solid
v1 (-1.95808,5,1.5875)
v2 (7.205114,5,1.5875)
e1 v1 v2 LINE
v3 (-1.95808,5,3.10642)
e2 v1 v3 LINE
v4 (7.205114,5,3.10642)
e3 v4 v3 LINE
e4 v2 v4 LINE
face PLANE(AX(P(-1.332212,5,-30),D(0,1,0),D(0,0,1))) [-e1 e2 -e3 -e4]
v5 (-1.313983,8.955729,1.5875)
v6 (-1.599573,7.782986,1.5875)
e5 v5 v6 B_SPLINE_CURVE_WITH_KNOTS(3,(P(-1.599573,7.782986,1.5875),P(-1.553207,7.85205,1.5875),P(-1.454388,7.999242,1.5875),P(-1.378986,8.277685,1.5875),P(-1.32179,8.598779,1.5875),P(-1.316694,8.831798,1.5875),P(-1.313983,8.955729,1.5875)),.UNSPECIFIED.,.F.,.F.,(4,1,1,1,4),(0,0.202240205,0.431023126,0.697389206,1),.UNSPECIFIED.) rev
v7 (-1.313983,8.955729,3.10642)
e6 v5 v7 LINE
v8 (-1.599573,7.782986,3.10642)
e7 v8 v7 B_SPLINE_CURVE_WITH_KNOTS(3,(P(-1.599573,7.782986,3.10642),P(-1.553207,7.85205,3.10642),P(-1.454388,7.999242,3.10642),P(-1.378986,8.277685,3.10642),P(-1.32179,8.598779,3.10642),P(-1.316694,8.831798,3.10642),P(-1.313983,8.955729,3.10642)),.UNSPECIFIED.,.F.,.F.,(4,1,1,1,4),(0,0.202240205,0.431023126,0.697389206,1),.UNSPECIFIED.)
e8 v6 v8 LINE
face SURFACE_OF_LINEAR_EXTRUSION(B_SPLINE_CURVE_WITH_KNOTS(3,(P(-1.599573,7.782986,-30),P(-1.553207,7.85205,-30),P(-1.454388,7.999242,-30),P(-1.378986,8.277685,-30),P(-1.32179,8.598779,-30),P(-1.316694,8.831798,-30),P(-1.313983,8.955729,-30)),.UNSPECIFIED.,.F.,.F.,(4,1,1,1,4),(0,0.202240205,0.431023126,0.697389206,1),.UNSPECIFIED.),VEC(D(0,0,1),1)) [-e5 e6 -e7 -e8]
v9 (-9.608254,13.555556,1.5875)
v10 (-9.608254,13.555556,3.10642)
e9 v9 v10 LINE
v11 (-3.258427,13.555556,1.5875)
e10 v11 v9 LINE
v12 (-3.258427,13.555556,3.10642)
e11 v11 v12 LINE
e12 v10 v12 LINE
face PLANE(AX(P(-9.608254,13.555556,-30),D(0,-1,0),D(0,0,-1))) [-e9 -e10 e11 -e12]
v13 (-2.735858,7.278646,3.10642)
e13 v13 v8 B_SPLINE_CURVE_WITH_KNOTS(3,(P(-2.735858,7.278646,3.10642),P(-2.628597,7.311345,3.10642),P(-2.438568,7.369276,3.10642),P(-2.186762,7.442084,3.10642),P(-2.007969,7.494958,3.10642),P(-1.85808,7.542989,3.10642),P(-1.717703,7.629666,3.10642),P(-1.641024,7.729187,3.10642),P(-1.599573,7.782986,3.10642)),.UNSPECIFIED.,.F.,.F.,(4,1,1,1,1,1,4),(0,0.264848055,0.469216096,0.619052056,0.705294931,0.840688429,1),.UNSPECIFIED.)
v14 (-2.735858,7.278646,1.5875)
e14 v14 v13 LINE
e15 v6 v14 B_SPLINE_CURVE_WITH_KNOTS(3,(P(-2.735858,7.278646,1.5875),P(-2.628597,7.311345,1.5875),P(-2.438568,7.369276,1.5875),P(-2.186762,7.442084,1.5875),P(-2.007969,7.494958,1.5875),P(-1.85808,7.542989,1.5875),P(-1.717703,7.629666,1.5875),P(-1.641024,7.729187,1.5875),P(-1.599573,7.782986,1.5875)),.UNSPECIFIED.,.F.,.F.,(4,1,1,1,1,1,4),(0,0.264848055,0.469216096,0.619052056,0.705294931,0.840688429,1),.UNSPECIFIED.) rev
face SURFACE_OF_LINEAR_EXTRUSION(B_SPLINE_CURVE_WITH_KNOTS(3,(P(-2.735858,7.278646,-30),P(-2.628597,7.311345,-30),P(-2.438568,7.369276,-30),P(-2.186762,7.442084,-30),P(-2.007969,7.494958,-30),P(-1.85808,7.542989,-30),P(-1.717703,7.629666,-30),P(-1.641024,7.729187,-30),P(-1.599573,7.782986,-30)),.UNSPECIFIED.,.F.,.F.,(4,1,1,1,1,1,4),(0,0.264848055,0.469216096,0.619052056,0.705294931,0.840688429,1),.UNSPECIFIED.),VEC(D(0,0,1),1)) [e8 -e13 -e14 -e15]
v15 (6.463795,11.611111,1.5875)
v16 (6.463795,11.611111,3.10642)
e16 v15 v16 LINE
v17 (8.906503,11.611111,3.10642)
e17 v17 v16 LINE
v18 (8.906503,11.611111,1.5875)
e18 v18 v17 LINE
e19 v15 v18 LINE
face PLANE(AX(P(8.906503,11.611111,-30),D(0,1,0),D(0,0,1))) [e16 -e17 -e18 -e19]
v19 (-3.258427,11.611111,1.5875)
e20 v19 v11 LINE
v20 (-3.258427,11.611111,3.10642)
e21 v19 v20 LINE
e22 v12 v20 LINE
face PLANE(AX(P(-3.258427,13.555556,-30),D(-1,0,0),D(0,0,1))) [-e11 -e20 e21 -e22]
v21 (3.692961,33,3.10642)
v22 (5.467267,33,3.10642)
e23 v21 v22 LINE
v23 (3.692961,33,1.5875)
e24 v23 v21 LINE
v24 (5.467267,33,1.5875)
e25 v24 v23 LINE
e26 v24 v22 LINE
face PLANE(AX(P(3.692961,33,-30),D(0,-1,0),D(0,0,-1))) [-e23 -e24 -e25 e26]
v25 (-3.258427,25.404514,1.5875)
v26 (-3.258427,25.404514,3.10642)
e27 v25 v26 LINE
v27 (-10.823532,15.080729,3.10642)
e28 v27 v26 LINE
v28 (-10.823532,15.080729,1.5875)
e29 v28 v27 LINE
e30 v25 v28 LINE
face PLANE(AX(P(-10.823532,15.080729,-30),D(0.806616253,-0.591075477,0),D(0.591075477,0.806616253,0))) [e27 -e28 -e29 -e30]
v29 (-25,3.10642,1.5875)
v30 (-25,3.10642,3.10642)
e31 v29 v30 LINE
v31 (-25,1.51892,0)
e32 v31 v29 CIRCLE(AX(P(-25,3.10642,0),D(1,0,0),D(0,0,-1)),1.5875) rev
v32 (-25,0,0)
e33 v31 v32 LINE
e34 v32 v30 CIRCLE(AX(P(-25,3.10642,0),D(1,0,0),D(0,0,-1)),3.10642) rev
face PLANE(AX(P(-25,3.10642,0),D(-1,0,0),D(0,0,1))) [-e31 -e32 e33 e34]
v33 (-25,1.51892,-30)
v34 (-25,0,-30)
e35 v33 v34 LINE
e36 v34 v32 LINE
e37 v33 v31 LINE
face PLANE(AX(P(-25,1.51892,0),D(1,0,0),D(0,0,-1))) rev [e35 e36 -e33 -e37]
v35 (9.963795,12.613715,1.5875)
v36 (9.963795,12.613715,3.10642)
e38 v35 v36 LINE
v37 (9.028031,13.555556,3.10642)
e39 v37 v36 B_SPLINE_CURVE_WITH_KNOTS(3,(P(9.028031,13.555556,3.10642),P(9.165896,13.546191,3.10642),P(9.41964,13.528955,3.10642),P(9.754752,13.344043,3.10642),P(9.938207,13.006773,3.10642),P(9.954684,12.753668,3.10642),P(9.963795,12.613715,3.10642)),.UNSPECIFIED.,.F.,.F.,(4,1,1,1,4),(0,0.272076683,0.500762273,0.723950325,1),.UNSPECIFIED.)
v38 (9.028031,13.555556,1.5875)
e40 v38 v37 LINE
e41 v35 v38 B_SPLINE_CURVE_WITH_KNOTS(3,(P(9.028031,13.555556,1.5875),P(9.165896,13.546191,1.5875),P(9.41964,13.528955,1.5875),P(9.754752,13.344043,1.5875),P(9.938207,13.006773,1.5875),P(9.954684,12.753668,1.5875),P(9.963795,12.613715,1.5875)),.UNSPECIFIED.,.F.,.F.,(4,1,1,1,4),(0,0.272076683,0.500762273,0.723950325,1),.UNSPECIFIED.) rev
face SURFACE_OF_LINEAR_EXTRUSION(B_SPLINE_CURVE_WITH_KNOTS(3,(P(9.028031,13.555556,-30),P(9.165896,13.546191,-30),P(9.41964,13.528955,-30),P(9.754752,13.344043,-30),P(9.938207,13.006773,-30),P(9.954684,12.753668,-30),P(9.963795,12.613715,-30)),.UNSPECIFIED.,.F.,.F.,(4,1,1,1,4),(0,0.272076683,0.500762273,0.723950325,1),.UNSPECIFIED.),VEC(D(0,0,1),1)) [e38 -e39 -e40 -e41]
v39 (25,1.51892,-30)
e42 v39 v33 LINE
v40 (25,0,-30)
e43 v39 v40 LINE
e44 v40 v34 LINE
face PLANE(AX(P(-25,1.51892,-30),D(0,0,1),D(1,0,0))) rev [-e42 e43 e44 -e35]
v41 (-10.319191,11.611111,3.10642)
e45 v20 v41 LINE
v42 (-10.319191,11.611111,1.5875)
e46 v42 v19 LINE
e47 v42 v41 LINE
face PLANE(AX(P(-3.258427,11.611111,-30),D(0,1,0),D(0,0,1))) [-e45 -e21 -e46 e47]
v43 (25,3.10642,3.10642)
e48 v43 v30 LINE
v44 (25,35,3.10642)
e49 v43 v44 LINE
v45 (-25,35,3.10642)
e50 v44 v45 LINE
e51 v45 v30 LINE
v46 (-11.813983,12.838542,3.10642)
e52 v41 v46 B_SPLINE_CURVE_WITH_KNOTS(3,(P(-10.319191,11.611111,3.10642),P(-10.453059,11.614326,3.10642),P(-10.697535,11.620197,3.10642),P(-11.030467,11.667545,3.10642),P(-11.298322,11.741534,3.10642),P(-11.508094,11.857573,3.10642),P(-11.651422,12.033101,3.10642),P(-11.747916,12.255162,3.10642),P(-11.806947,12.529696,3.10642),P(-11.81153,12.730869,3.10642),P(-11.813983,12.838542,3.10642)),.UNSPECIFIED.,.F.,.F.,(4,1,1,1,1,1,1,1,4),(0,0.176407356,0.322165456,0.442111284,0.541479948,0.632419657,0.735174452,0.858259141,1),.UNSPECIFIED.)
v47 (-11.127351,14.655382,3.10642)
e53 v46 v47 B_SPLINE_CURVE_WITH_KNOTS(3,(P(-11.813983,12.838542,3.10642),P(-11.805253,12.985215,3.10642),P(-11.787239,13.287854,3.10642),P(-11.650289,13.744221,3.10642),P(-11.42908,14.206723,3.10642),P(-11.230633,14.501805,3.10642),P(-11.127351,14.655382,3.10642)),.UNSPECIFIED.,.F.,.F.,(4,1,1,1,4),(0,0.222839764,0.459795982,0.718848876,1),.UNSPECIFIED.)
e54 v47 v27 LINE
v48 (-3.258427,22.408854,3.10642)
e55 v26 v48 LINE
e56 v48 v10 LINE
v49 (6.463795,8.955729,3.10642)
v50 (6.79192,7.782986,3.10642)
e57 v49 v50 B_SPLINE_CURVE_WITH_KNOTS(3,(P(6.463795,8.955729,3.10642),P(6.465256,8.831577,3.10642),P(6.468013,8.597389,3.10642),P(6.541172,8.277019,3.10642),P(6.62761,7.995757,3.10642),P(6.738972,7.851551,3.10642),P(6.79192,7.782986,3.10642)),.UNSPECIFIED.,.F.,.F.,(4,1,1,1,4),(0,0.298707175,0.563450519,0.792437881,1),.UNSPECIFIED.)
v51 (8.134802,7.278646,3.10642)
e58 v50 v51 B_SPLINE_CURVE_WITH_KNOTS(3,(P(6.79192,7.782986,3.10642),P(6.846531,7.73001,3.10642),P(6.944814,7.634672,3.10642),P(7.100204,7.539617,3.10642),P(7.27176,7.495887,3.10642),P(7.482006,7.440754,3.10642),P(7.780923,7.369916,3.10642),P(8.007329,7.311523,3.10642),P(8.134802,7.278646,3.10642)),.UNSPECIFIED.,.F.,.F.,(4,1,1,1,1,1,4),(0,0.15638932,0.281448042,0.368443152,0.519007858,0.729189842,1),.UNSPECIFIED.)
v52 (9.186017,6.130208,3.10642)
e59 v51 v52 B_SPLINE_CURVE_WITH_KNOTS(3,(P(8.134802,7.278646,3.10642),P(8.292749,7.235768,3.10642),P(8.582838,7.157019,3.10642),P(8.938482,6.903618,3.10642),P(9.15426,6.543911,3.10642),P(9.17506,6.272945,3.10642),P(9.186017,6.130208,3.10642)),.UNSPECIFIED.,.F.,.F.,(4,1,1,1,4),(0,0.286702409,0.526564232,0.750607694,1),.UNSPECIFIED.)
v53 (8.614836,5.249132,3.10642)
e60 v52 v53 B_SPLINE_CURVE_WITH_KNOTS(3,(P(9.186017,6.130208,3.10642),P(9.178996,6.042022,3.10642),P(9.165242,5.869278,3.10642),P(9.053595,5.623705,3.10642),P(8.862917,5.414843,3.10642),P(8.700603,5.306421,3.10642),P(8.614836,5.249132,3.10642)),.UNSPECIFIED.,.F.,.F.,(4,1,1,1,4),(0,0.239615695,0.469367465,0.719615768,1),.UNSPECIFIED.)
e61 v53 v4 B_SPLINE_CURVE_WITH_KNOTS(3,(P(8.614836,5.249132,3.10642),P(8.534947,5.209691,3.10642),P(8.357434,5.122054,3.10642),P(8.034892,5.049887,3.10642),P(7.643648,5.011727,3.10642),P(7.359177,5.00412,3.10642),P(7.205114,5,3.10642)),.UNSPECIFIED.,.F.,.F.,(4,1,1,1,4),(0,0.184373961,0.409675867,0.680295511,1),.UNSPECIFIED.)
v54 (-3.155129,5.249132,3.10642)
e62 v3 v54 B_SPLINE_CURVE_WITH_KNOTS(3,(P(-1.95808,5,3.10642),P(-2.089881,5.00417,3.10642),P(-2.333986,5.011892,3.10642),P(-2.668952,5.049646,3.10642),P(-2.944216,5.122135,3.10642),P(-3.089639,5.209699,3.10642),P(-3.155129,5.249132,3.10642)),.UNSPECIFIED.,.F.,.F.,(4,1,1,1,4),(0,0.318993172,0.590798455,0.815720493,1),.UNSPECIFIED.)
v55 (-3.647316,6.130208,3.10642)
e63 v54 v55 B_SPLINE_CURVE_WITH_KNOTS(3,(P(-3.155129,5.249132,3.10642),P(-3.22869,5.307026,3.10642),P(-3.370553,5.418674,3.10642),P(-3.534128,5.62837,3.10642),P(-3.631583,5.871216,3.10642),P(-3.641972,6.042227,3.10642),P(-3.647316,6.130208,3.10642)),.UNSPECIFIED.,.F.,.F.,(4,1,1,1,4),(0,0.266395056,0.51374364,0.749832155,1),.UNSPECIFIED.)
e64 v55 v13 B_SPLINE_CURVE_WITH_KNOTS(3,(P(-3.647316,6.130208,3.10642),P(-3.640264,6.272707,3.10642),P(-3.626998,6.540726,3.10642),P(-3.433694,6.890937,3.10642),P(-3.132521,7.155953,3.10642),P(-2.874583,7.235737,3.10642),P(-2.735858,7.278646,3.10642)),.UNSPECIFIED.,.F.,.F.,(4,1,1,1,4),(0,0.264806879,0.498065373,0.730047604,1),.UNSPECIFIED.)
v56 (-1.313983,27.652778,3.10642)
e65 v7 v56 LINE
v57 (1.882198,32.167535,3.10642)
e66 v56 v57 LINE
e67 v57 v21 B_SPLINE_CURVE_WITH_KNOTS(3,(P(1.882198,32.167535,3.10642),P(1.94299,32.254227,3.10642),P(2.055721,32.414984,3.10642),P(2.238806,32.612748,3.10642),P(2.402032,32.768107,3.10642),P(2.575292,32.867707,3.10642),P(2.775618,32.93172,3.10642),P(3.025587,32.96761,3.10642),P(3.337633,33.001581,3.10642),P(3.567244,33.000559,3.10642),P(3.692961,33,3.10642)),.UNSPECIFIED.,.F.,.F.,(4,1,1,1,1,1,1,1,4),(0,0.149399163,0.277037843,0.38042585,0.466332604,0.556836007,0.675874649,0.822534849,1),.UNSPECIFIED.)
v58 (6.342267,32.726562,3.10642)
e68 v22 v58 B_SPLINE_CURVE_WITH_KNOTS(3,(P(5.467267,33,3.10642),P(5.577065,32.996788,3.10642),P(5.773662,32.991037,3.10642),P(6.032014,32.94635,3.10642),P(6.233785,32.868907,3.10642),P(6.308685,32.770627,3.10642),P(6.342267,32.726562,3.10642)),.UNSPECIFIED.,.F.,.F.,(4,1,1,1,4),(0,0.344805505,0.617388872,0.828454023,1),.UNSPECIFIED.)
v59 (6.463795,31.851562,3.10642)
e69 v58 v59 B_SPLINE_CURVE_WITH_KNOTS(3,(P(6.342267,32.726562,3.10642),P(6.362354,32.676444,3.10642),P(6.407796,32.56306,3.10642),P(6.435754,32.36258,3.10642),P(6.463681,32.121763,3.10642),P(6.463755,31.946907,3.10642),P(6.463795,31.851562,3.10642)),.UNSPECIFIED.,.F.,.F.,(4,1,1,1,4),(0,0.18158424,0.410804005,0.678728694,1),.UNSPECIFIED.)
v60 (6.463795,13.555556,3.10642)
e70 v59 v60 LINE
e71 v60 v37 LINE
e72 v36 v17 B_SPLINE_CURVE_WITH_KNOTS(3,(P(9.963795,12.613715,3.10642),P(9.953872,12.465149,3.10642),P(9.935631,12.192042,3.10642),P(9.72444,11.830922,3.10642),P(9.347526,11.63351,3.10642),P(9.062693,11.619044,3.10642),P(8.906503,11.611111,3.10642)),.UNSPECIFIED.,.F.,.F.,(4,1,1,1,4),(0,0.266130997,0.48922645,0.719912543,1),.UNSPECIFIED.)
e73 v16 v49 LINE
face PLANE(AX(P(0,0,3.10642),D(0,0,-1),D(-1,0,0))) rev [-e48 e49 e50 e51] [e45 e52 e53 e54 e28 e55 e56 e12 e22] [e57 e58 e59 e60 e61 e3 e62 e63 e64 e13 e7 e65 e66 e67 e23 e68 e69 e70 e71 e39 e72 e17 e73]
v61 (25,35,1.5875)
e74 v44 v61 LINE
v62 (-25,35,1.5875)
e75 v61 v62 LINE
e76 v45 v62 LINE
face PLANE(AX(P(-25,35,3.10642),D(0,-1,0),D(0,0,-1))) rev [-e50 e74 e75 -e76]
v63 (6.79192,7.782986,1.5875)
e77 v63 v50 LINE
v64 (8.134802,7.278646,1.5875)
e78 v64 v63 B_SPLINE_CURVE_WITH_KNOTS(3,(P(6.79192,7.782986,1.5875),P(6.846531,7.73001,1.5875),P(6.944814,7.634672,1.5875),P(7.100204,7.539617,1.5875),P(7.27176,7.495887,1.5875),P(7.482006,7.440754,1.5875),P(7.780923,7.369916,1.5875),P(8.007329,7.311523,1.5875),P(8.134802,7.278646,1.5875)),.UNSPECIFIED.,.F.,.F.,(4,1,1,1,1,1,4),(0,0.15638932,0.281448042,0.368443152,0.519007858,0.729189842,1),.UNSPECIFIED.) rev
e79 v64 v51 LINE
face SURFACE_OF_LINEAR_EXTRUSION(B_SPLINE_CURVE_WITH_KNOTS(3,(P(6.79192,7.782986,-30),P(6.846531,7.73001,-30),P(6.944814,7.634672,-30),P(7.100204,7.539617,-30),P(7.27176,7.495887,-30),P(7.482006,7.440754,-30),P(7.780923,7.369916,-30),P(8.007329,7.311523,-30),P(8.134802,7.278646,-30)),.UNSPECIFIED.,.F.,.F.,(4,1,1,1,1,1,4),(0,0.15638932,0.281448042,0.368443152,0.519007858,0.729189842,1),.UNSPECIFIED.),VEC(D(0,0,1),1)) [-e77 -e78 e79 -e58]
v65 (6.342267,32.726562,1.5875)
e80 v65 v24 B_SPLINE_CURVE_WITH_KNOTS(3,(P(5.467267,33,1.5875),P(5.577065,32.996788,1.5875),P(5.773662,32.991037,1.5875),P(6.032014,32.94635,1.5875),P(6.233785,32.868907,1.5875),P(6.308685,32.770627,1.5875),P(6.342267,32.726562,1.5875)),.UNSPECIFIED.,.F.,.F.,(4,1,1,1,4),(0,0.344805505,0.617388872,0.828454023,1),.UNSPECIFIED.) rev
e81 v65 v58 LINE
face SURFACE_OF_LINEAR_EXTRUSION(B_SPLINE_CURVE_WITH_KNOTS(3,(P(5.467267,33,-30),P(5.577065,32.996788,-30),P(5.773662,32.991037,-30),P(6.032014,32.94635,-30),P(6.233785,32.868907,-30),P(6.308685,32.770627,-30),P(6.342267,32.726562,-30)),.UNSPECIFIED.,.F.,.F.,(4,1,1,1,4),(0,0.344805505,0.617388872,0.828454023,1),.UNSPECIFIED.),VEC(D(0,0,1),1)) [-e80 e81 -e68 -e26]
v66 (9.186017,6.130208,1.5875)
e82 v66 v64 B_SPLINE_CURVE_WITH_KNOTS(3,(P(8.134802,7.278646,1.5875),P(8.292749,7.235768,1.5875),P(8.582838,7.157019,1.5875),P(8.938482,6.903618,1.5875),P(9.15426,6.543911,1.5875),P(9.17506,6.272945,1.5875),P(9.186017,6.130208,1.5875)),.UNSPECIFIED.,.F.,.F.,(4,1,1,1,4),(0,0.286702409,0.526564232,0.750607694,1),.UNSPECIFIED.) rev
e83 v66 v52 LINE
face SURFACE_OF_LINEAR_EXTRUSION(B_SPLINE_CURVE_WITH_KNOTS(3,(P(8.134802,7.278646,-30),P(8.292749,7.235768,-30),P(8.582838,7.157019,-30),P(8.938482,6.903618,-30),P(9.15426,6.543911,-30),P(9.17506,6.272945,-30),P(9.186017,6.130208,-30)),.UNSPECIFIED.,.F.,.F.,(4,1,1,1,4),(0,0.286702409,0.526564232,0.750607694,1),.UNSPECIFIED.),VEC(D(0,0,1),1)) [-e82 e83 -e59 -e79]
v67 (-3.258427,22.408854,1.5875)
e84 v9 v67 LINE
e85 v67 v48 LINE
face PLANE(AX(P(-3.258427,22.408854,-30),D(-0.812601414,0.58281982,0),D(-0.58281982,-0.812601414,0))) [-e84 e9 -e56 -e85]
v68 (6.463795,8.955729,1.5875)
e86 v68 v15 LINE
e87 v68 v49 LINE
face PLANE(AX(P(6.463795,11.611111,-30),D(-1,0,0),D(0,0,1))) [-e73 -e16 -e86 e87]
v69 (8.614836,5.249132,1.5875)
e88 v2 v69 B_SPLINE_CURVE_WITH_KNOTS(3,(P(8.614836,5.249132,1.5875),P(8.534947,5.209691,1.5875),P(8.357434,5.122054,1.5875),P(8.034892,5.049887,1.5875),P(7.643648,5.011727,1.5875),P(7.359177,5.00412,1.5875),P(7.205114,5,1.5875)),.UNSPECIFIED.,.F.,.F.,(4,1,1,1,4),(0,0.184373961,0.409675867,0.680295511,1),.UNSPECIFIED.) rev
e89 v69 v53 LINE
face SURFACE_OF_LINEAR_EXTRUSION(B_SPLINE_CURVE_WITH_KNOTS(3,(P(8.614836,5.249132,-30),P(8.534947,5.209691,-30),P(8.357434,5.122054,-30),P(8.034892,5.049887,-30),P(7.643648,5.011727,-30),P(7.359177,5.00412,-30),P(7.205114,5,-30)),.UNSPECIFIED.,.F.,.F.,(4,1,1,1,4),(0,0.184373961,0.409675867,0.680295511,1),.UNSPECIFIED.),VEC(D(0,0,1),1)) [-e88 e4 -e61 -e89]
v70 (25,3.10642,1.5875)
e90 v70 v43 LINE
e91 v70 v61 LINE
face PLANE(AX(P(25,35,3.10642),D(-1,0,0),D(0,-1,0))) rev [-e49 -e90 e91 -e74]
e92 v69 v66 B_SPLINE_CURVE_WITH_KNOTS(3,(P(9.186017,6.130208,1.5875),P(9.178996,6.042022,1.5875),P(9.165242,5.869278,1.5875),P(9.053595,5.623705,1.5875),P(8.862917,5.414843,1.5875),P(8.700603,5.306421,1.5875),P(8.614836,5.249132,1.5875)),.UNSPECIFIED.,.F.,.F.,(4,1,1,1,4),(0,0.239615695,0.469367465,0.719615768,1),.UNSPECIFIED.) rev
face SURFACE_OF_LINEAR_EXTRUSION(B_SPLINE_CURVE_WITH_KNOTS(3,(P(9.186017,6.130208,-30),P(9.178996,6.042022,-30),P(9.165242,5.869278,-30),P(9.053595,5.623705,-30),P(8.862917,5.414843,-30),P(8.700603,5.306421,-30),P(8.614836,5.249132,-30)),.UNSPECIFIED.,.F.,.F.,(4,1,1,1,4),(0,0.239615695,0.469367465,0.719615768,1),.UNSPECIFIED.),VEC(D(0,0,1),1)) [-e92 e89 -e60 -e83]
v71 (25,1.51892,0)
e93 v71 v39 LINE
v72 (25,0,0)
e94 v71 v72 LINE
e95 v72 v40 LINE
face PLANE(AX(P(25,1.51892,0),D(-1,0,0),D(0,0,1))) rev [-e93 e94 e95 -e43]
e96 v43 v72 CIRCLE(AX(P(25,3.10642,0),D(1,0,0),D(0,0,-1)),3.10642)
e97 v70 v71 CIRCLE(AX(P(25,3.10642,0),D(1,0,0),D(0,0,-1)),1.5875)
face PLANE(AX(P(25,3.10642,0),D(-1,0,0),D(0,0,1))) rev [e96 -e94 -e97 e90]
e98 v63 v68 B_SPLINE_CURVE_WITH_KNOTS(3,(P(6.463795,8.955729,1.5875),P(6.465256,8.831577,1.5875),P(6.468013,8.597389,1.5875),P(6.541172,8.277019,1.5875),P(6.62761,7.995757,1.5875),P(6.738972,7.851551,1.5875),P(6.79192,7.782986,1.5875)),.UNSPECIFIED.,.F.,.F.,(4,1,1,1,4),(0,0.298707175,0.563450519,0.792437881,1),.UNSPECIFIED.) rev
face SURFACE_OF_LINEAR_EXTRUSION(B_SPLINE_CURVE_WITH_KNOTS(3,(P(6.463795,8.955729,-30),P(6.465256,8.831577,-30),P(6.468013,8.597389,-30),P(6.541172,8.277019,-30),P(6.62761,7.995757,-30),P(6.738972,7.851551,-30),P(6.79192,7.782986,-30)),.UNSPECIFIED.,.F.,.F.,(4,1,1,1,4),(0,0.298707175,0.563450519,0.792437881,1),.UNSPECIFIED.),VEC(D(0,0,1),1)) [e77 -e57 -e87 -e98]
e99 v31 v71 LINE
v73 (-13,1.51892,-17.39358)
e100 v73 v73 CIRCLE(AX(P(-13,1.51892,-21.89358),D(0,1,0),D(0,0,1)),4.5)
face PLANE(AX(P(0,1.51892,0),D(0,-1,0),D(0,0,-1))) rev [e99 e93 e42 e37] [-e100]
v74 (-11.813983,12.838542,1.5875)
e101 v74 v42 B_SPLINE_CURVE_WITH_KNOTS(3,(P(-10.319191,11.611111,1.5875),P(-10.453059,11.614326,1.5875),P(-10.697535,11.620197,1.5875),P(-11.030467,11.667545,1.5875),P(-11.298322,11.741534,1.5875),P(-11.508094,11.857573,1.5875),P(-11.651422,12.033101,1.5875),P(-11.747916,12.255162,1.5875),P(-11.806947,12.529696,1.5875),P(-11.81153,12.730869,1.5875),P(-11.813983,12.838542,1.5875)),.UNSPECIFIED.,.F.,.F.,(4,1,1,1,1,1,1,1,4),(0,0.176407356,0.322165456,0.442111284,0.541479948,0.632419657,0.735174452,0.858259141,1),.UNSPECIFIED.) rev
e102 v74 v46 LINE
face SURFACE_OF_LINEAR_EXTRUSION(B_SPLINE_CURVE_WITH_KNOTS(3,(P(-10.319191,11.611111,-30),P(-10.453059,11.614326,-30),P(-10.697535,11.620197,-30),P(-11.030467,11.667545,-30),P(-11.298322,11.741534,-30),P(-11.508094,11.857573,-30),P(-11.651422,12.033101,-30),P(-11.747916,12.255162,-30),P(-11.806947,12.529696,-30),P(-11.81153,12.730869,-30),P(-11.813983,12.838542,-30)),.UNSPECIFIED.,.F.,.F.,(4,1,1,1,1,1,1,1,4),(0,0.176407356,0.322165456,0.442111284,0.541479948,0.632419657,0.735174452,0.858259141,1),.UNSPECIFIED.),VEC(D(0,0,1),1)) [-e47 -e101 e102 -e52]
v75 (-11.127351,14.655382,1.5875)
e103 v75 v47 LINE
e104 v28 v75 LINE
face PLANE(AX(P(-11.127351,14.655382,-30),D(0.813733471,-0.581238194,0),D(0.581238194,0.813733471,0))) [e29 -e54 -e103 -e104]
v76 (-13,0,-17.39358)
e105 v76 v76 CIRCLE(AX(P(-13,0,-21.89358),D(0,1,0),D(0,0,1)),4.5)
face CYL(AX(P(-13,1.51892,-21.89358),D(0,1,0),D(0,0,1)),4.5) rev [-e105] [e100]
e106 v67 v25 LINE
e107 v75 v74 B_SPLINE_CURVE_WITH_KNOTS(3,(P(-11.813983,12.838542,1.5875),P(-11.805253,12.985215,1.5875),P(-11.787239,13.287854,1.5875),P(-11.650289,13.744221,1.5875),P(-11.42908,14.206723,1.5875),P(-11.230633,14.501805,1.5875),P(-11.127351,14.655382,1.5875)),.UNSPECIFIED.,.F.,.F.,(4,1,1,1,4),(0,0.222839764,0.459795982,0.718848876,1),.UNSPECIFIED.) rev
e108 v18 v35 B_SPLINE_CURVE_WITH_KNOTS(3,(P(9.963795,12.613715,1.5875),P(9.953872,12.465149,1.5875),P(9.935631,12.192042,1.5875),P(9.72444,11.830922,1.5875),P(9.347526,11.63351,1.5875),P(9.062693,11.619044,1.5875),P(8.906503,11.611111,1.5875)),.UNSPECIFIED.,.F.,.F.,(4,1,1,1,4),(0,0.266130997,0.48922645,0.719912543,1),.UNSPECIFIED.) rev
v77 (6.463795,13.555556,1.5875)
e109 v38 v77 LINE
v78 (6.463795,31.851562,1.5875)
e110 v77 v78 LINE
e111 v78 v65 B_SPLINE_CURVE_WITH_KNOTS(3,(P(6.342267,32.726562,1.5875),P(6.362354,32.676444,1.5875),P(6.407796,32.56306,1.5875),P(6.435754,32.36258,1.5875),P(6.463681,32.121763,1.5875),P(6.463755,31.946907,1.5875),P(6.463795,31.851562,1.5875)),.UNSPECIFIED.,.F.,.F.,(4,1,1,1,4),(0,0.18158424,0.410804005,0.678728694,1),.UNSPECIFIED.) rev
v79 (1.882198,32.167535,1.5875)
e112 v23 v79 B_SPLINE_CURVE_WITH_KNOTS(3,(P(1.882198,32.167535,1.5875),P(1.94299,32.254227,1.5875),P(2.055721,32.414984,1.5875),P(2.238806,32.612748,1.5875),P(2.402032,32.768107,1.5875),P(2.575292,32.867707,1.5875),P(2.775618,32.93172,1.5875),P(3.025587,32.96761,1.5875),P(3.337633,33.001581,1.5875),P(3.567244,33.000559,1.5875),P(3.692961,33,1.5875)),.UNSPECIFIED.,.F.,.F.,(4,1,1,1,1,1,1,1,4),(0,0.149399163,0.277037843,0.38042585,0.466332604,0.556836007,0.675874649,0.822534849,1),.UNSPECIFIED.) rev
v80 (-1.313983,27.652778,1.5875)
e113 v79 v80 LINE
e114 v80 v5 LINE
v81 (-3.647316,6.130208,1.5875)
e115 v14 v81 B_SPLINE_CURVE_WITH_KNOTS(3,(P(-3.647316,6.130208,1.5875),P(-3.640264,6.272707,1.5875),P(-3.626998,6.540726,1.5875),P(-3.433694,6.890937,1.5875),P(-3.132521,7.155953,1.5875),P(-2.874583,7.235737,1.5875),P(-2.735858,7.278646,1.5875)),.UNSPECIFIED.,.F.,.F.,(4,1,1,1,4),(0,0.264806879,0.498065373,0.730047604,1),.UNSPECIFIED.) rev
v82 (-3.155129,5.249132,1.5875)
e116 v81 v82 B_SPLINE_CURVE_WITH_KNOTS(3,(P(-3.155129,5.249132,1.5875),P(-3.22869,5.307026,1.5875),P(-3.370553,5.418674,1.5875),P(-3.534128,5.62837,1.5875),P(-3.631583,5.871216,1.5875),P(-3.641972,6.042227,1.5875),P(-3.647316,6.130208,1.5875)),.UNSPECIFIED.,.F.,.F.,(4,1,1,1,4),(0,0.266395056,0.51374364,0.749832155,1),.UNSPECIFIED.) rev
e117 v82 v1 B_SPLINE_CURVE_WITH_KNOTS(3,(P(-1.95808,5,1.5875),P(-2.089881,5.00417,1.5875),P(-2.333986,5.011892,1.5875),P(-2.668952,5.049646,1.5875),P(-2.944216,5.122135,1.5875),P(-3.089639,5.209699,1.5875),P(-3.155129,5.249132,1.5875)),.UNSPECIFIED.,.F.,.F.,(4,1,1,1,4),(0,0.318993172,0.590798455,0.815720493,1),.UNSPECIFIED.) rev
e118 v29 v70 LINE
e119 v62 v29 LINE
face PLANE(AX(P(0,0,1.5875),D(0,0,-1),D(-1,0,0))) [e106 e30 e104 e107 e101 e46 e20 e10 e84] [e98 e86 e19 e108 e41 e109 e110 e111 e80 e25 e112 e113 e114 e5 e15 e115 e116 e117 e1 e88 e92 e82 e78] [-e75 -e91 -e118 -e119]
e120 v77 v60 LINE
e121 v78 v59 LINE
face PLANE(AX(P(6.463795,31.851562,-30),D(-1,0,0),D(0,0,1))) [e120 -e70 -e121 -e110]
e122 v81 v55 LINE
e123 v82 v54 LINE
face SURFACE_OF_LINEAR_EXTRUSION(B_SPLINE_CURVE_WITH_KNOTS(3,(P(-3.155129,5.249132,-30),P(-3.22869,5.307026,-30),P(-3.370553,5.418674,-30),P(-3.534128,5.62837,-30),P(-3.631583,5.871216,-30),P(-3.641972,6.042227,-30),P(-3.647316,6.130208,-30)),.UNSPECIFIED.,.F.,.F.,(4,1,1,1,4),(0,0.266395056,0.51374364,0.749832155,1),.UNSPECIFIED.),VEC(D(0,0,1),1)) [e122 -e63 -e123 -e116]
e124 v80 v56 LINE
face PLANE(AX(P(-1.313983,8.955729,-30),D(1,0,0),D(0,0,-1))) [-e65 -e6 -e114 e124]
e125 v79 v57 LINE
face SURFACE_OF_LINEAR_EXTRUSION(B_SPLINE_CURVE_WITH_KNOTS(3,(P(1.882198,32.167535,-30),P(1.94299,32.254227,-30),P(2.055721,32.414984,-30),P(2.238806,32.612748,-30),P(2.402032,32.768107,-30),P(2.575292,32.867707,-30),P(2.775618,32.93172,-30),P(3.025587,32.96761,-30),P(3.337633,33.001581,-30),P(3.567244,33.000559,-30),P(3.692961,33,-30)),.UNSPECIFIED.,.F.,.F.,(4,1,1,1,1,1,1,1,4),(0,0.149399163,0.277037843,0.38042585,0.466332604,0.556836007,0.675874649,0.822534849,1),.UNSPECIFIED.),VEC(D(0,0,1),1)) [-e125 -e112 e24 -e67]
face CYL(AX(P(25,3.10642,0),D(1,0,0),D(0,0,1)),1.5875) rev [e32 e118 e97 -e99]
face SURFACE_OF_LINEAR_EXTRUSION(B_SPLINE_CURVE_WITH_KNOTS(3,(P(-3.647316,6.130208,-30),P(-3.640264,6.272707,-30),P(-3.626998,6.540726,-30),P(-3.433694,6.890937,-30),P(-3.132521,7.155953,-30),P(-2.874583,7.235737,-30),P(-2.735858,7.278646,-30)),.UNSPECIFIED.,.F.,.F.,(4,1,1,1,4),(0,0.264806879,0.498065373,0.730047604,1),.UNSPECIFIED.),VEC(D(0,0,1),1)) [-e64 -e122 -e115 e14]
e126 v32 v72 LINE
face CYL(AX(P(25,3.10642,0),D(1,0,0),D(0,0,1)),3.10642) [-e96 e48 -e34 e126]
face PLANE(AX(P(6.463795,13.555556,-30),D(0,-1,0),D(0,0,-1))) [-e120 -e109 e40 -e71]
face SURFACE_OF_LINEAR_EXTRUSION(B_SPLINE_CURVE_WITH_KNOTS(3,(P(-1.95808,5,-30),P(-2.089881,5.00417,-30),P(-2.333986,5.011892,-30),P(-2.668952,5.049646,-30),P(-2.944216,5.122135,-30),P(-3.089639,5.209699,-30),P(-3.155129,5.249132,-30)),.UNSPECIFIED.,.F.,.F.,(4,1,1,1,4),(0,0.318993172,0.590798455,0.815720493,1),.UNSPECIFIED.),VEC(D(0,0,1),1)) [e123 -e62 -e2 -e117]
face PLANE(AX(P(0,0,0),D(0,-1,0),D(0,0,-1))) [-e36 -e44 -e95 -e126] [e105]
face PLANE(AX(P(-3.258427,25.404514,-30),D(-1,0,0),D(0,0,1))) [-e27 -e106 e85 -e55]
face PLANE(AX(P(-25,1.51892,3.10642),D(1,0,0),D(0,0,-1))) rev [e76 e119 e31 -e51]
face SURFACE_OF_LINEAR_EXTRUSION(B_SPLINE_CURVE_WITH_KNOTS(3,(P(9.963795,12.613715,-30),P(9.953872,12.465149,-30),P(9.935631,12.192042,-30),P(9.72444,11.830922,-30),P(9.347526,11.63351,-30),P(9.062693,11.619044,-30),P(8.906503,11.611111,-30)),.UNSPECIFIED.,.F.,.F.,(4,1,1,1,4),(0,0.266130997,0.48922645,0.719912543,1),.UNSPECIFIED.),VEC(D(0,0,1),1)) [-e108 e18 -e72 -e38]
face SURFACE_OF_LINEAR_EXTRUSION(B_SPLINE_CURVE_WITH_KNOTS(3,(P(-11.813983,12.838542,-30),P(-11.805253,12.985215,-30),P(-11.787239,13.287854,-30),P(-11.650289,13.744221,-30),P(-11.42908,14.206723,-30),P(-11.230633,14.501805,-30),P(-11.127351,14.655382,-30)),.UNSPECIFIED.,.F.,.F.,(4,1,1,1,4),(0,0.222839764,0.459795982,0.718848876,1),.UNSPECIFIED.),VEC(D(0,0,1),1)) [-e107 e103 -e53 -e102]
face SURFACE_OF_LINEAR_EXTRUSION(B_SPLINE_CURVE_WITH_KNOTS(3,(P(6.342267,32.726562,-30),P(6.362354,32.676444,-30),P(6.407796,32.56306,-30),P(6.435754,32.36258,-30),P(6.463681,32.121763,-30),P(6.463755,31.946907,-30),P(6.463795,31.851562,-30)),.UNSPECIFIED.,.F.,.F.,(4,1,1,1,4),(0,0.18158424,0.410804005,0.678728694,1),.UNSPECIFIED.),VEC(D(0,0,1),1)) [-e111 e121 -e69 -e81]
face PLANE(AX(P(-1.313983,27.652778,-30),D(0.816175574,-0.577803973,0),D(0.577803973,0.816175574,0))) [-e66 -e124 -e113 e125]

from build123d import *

# Parameters (mm, degrees)
SKETCH1_W            = 50
SKETCH1_H            = 30
BASE_FLANGE1_DEPTH   = 1.51892
EDGE_FLANGE1_DEPTH   = 50
M8_CLEARANCE_HOLE1_D = 9
CUT_EXTRUDE1_DEPTH   = 55.277389816


# Sheet-metal steps are written as plain solids
with BuildPart() as part:
    # Sketch1 → Base-Flange1 (new body)
    with BuildSketch(Plane(origin=(0, 0, 0), x_dir=(1, 0, 0), z_dir=(0, 1, 0))):
        with Locations((0, 15)):
            Rectangle(SKETCH1_W, SKETCH1_H)
    extrude(amount=BASE_FLANGE1_DEPTH)

    # Edge-Flange1 section (across the edge) → Edge-Flange1 (add)
    with BuildSketch(Plane(origin=(-25, 1.51892, 1.5875), x_dir=(0, 0, -1), z_dir=(1, 0, 0))):
        with BuildLine():
            Line((-1.51892, 1.5875), (-1.51892, 33.48108))
            Line((-1.51892, 33.48108), (0, 33.48108))
            Line((0, 33.48108), (0, 1.5875))
            ThreePointArc((0, 1.5875), (0.464967985, 0.464967985), (1.5875, 0))
            Line((1.5875, 0), (1.5875, -1.51892))
            ThreePointArc((1.5875, -1.51892), (-0.609070647, -0.609070647), (-1.51892, 1.5875))
        make_face()
    extrude(amount=EDGE_FLANGE1_DEPTH)

    # M8 Clearance Hole1 (through all)
    with Locations(Plane(origin=(0, 1.51892, 0), x_dir=(1, 0, 0), z_dir=(0, 1, 0))):
        with Locations((-13, 21.89358)):
            Hole(M8_CLEARANCE_HOLE1_D / 2)

    # Sketch11 → Cut-Extrude1 (cut, through all)
    with BuildSketch(Plane.XY.offset(3.10642)):
        with BuildLine():
            Line((-1.313983013, 27.652777778), (1.882197542, 32.167534722))
            add(Edge.make_bspline(
                [(1.882197542, 32.167534722), (1.942990154, 32.25422683), (2.055720733, 32.414984053), (2.238806296, 32.612748461), (2.402031604, 32.768107394), (2.575292151, 32.867707043), (2.775618459, 32.931720261), (3.025586613, 32.967610097), (3.337632557, 33.001581085), (3.567244353, 33.000559396), (3.692961431, 33)],
                knots=[0, 0, 0, 0, 1.195193305, 2.216302741, 3.043406804, 3.730660832, 4.454688059, 5.406997193, 6.580278791, 8, 8, 8, 8], degree=3))
            Line((3.692961431, 33), (5.467266987, 33))
            add(Edge.make_bspline(
                [(5.467266987, 33), (5.577064754, 32.996788141), (5.77366231, 32.991037172), (6.032013828, 32.946349792), (6.233785133, 32.868906911), (6.308685128, 32.770626919), (6.342266987, 32.7265625)],
                knots=[0, 0, 0, 0, 1.37922202, 2.469555487, 3.31381609, 4, 4, 4, 4], degree=3))
            add(Edge.make_bspline(
                [(6.342266987, 32.7265625), (6.362353673, 32.676444121), (6.407796446, 32.563059661), (6.435754197, 32.362580464), (6.463680714, 32.121762999), (6.46375452, 31.94690658), (6.463794764, 31.8515625)],
                knots=[0, 0, 0, 0, 0.726336959, 1.64321602, 2.714914776, 4, 4, 4, 4], degree=3))
            Line((6.463794764, 31.8515625), (6.463794764, 13.555555556))
            Line((6.463794764, 13.555555556), (9.028030875, 13.555555556))
            add(Edge.make_bspline(
                [(9.028030875, 13.555555556), (9.165896219, 13.546190847), (9.419639988, 13.528954925), (9.754751832, 13.344043), (9.938206738, 13.006772556), (9.954683864, 12.75366768), (9.963794764, 12.613715278)],
                knots=[0, 0, 0, 0, 1.088306732, 2.003049094, 2.895801301, 4, 4, 4, 4], degree=3))
            add(Edge.make_bspline(
                [(9.963794764, 12.613715278), (9.953871828, 12.46514926), (9.935630574, 12.192041557), (9.724439936, 11.830921806), (9.34752556, 11.633510395), (9.062693451, 11.619043932), (8.906503098, 11.611111111)],
                knots=[0, 0, 0, 0, 1.064523988, 1.9569058, 2.879650172, 4, 4, 4, 4], degree=3))
            Line((8.906503098, 11.611111111), (6.463794764, 11.611111111))
            Line((6.463794764, 11.611111111), (6.463794764, 8.955729167))
            add(Edge.make_bspline(
                [(6.463794764, 8.955729167), (6.465256175, 8.831576902), (6.468012829, 8.59738883), (6.54117183, 8.277019076), (6.627610008, 7.995757008), (6.738971671, 7.851550593), (6.791919764, 7.782986111)],
                knots=[0, 0, 0, 0, 1.194828702, 2.253802076, 3.169751524, 4, 4, 4, 4], degree=3))
            add(Edge.make_bspline(
                [(6.791919764, 7.782986111), (6.846531378, 7.730010442), (6.944813868, 7.634672101), (7.100203776, 7.539617352), (7.27176022, 7.495886787), (7.482006075, 7.440754455), (7.780922877, 7.369916119), (8.00732939, 7.311522722), (8.134801709, 7.278645833)],
                knots=[0, 0, 0, 0, 0.938335918, 1.688688255, 2.210658911, 3.11404715, 4.375139053, 6, 6, 6, 6], degree=3))
            add(Edge.make_bspline(
                [(8.134801709, 7.278645833), (8.292748806, 7.235768373), (8.582838073, 7.157018646), (8.93848225, 6.903617509), (9.154259726, 6.543911357), (9.175060001, 6.272945389), (9.186016987, 6.130208333)],
                knots=[0, 0, 0, 0, 1.146809638, 2.106256929, 3.002430776, 4, 4, 4, 4], degree=3))
            add(Edge.make_bspline(
                [(9.186016987, 6.130208333), (9.17899553, 6.042021554), (9.165241661, 5.869278259), (9.05359535, 5.623704764), (8.862916658, 5.414842755), (8.700602579, 5.306421387), (8.614836431, 5.249131944)],
                knots=[0, 0, 0, 0, 0.958462782, 1.877469862, 2.878463071, 4, 4, 4, 4], degree=3))
            add(Edge.make_bspline(
                [(8.614836431, 5.249131944), (8.534946889, 5.209690912), (8.357433658, 5.122053596), (8.034892473, 5.049887402), (7.643647807, 5.011727038), (7.359176572, 5.004119856), (7.205114209, 5)],
                knots=[0, 0, 0, 0, 0.737495844, 1.638703467, 2.721182046, 4, 4, 4, 4], degree=3))
            Line((7.205114209, 5), (6.482023931, 5))
            Line((6.482023931, 5), (-1.33221218, 5))
            Line((-1.33221218, 5), (-1.958080236, 5))
            add(Edge.make_bspline(
                [(-1.958080236, 5), (-2.089881071, 5.00416961), (-2.333985762, 5.01189203), (-2.66895246, 5.049646344), (-2.944215562, 5.122135251), (-3.089638978, 5.209698692), (-3.155128847, 5.249131944)],
                knots=[0, 0, 0, 0, 1.275972689, 2.363193818, 3.262881972, 4, 4, 4, 4], degree=3))
            add(Edge.make_bspline(
                [(-3.155128847, 5.249131944), (-3.228690112, 5.307025561), (-3.370553227, 5.418673569), (-3.534127754, 5.628370393), (-3.631583422, 5.871216423), (-3.641971775, 6.042227184), (-3.647316347, 6.130208333)],
                knots=[0, 0, 0, 0, 1.065580224, 2.054974559, 2.999328622, 4, 4, 4, 4], degree=3))
            add(Edge.make_bspline(
                [(-3.647316347, 6.130208333), (-3.640263565, 6.272706576), (-3.626998251, 6.540726201), (-3.433693624, 6.890936561), (-3.132521052, 7.155953313), (-2.874583156, 7.235736523), (-2.735858013, 7.278645833)],
                knots=[0, 0, 0, 0, 1.059227515, 1.99226149, 2.920190418, 4, 4, 4, 4], degree=3))
            add(Edge.make_bspline(
                [(-2.735858013, 7.278645833), (-2.628596603, 7.311344749), (-2.438567719, 7.36927554), (-2.186761633, 7.442084104), (-2.007968702, 7.494958163), (-1.85808029, 7.542989269), (-1.717703343, 7.629665553), (-1.64102438, 7.729186896), (-1.599573291, 7.782986111)],
                knots=[0, 0, 0, 0, 1.58908833, 2.815296579, 3.714312333, 4.231769587, 5.044130571, 6, 6, 6, 6], degree=3))
            add(Edge.make_bspline(
                [(-1.599573291, 7.782986111), (-1.553206662, 7.852049956), (-1.454388083, 7.999241828), (-1.378985552, 8.277685094), (-1.321790362, 8.598779226), (-1.316693685, 8.831797968), (-1.313983013, 8.955729167)],
                knots=[0, 0, 0, 0, 0.808960821, 1.724092502, 2.789556825, 4, 4, 4, 4], degree=3))
            Line((-1.313983013, 8.955729167), (-1.313983013, 27.652777778))
        make_face()
        with BuildLine():
            Line((-3.258427458, 25.404513889), (-3.258427458, 22.408854167))
            Line((-3.258427458, 22.408854167), (-9.608253847, 13.555555556))
            Line((-9.608253847, 13.555555556), (-3.258427458, 13.555555556))
            Line((-3.258427458, 13.555555556), (-3.258427458, 11.611111111))
            Line((-3.258427458, 11.611111111), (-10.319191347, 11.611111111))
            add(Edge.make_bspline(
                [(-10.319191347, 11.611111111), (-10.453058826, 11.614326043), (-10.697535464, 11.62019734), (-11.030466888, 11.667544917), (-11.298322213, 11.741534104), (-11.508093604, 11.857572638), (-11.651421931, 12.033101366), (-11.747915639, 12.255162092), (-11.806947017, 12.529695798), (-11.811530061, 12.730869026), (-11.813983013, 12.838541667)],
                knots=[0, 0, 0, 0, 1.411258846, 2.577323645, 3.536890269, 4.331839585, 5.059357258, 5.881395614, 6.866073128, 8, 8, 8, 8], degree=3))
            add(Edge.make_bspline(
                [(-11.813983013, 12.838541667), (-11.805252819, 12.985215395), (-11.787239389, 13.287854337), (-11.650289436, 13.74422143), (-11.429079802, 14.206722525), (-11.230633277, 14.501805138), (-11.127351069, 14.655381944)],
                knots=[0, 0, 0, 0, 0.891359058, 1.839183926, 2.875395504, 4, 4, 4, 4], degree=3))
            Line((-11.127351069, 14.655381944), (-10.823531625, 15.080729167))
            Line((-10.823531625, 15.080729167), (-3.258427458, 25.404513889))
        make_face()
    extrude(amount=-CUT_EXTRUDE1_DEPTH, mode=Mode.SUBTRACT)


solid = part.part
